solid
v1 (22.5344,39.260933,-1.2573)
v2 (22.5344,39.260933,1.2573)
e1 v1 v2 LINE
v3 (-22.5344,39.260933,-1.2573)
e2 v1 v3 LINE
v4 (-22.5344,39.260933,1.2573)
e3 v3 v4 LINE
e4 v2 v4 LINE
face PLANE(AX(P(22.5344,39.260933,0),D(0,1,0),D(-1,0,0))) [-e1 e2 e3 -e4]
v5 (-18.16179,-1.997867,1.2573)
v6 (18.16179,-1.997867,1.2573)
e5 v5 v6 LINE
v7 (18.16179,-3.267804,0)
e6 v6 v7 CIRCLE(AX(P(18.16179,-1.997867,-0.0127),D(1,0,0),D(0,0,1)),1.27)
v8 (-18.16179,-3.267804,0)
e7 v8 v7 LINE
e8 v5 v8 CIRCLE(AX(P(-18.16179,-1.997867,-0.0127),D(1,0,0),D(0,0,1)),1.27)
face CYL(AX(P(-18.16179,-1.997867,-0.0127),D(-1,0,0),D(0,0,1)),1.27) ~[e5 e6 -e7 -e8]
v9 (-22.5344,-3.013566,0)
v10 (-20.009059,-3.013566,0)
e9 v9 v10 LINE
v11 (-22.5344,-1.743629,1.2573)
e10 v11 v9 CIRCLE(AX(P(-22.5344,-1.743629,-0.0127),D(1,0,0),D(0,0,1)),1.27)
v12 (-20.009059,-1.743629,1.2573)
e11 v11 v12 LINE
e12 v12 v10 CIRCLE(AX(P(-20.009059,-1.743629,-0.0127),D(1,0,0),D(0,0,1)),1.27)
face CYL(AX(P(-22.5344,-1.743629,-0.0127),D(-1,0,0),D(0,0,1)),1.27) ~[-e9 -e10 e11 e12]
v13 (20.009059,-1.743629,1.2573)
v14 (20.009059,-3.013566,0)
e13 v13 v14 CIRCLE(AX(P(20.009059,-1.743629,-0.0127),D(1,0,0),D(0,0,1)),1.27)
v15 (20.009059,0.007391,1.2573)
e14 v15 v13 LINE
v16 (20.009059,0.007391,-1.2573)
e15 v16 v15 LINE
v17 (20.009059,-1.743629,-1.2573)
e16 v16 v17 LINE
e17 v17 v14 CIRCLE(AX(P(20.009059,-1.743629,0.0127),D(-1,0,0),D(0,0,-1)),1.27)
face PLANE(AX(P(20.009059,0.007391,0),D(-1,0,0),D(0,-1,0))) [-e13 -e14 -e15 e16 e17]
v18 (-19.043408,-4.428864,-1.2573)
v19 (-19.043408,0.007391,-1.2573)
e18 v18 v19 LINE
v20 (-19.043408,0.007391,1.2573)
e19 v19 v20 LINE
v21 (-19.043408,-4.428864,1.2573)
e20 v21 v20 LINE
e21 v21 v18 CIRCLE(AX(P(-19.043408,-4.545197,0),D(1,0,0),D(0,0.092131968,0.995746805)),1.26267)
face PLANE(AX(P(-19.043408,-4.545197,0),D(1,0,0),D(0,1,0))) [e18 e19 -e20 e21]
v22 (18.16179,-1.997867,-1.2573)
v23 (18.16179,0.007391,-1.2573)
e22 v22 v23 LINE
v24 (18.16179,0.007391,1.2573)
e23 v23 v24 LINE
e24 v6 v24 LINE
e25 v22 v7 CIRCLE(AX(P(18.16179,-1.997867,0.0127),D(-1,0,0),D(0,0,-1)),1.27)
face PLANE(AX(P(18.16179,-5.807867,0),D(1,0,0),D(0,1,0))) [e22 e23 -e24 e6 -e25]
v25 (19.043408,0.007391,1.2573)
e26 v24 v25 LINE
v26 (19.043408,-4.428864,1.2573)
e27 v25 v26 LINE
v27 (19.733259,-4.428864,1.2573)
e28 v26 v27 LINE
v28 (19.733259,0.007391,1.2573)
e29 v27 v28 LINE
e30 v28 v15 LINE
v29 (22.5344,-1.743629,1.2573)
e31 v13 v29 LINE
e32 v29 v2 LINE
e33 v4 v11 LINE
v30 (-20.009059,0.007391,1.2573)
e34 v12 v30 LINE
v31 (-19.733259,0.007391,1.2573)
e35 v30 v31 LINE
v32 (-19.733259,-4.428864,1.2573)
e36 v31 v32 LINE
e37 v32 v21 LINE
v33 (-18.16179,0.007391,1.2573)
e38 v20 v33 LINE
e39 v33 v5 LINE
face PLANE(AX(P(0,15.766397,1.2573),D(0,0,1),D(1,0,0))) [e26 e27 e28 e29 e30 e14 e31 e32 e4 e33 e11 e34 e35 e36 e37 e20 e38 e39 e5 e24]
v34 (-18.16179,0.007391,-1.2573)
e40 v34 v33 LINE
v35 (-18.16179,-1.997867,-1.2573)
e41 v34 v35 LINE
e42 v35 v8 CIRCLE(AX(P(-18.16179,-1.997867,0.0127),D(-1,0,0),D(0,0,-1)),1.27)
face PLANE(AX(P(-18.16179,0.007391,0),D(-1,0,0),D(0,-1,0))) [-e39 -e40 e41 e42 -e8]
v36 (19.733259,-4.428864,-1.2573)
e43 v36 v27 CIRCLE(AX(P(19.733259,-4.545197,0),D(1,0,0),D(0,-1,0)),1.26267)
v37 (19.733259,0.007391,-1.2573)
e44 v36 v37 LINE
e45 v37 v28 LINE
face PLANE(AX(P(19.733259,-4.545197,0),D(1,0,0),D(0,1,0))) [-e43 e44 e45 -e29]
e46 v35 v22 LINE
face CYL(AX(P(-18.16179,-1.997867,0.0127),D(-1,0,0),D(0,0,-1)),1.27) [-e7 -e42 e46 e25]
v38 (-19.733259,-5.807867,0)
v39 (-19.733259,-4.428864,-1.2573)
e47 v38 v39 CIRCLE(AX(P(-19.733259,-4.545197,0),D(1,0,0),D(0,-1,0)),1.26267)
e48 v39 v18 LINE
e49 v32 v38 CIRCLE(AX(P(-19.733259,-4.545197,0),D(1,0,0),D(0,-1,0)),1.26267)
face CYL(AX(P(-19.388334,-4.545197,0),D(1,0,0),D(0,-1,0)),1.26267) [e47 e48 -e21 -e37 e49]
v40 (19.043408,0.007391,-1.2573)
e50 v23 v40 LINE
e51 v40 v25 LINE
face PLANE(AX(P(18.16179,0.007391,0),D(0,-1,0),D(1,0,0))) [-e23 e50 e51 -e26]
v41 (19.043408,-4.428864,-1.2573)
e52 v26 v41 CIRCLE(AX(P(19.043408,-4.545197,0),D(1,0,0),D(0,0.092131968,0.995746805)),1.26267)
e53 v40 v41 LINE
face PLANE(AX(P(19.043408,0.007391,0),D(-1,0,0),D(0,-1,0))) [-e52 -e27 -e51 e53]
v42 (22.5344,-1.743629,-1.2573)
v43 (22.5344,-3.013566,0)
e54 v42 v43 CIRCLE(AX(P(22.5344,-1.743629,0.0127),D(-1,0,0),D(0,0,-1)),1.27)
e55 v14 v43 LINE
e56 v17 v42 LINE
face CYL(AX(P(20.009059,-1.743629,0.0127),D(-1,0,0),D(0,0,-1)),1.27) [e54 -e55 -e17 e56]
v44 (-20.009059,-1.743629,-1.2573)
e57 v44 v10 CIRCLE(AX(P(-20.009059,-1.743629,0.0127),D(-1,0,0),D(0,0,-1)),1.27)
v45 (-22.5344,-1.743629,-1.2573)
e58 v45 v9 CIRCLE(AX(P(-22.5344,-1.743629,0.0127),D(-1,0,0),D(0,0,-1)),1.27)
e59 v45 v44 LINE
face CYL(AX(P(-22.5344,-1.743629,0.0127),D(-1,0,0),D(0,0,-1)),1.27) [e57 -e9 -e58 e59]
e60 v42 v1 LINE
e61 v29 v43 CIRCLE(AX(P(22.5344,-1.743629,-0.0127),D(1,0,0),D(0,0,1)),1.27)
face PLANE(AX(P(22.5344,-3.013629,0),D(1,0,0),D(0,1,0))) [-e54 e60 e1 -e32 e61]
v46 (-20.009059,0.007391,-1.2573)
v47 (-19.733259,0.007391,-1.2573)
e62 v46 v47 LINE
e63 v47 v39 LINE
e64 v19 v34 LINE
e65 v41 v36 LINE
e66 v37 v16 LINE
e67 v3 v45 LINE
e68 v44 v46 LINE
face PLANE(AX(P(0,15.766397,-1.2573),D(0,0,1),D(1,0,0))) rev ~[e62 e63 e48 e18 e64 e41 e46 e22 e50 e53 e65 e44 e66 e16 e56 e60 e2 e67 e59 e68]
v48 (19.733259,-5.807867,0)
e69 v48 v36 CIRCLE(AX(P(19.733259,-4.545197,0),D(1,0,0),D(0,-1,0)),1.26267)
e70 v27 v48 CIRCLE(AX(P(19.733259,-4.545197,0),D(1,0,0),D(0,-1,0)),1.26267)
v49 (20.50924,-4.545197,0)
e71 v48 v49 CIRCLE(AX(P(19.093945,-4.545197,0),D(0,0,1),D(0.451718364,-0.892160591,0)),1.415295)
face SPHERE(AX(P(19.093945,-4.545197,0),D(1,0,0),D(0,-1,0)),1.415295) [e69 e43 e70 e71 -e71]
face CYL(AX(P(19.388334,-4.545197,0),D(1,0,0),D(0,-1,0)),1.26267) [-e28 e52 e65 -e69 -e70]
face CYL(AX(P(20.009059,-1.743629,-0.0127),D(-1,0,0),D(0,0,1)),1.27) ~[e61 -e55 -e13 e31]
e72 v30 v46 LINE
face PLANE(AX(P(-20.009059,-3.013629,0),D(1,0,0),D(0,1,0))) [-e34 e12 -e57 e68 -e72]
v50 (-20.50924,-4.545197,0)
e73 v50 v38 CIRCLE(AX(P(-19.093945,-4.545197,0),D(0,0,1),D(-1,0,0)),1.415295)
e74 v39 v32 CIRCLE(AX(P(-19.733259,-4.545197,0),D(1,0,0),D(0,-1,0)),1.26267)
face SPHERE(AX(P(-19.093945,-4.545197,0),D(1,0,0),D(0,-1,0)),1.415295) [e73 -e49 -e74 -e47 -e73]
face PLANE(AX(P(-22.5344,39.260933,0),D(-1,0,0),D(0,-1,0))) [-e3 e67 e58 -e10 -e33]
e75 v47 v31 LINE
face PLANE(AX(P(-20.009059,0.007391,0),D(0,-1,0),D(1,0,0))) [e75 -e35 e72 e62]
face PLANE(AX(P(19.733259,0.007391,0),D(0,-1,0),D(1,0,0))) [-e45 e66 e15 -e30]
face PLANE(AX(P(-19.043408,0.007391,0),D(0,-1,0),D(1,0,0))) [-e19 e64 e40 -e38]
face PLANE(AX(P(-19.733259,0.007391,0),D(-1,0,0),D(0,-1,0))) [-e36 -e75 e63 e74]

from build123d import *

# Parameters (mm, degrees)
F0_W        = 0.6898511201
F0_H        = 1.2626703829
F0_H_2      = 3.2899174839
F2_DEPTH    = 1.2573
F3_DEPTH    = 2.54
F4_T1_DEPTH = 36.3235808909
F4_T3_DEPTH = 2.5253407657
F4_T5_DEPTH = 2.5253407657


# Not quite as in the source:
# - a fillet or chamfer that OpenCascade refuses, or shapes differently, is made with other operations: its cross-section is extruded or revolved along the edge and cut away or added
# - a feature names something its author has since deleted; it is built from what else it names


with BuildPart() as f1:
    # F0 (on Top) → F1 (revolve)
    with BuildSketch(Plane.XY):
        with BuildLine():
            Line((-19.7332594544, -5.8078670874), (-19.7332594544, -4.5451967046))
            Line((-19.7332594544, -4.5451967046), (-20.5092396879, -4.5451967046))
            ThreePointArc((-20.5092396879, -4.5451967046), (-20.2997388093, -5.2862233267), (-19.7332594544, -5.8078670874))
        make_face()
        with Locations((-19.3883338943, -5.176531896)):
            Rectangle(F0_W, F0_H)
    revolve(axis=Axis((-19.3883338943, -4.5451967046, 0), (1, 0, 0)))



with BuildPart() as f1b:
    # F0 (on Top) → F1, piece 2 (revolve)
    with BuildSketch(Plane.XY):
        with BuildLine():
            Line((20.5092396879, -4.5451967046), (19.7332594544, -4.5451967046))
            Line((19.7332594544, -4.5451967046), (19.7332594544, -5.8078670874))
            ThreePointArc((19.7332594544, -5.8078670874), (20.2997388093, -5.2862233267), (20.5092396879, -4.5451967046))
        make_face()
        with Locations((19.3883338943, -5.176531896)):
            Rectangle(F0_W, F0_H)
    revolve(axis=Axis((-19.3883338943, -4.5451967046, 0), (1, 0, 0)))


with BuildPart() as f1_1:
    add(f1.part)

    add(f1b.part)  # F2 merges F1b
    # F0 (on Top) → F2 (join, symmetric)
    with BuildSketch(Plane.XY):
        Polygon((-20.009059459, 0.0073911622), (-19.7332594544, 0.0073911622), (-19.0434083343, 0.0073911622), (-18.1617904454, 0.0073911622), (-18.1617904454, -5.8078670874), (0, -5.8078670874), (18.1617904454, -5.8078670874), (18.1617904454, 0.0073911622), (19.0434083343, 0.0073911622), (19.7332594544, 0.0073911622), (20.009059459, 0.0073911622), (20.009059459, -3.01362928), (22.5344002247, -3.01362928), (22.5344002247, 39.2609333619), (0, 39.2609333619), (-22.5344002247, 39.2609333619), (-22.5344002247, -3.01362928), (-20.009059459, -3.01362928), align=None)
        with Locations((-19.3883338943, -1.6375675797)):
            Rectangle(F0_W, F0_H_2)
        with Locations((19.3883338943, -1.6375675797)):
            Rectangle(F0_W, F0_H_2)
        with Locations((-19.3883338943, -3.9138615131)):
            Rectangle(F0_W, F0_H)
        with Locations((19.3883338943, -3.9138615131)):
            Rectangle(F0_W, F0_H)
    extrude(amount=F2_DEPTH, both=True)

    # F3 (cut): a face of the model
    f3_faces = [f1_1.faces().sort_by_distance(p)[0] for p in [
        (0, -5.8078670874, 0),
    ]]
    extrude(f3_faces, amount=-F3_DEPTH, mode=Mode.SUBTRACT)

    # F4: fillet of radius 1.27 on 6 edges, made by hand

    # F4_s2 → F4_t1 (cut)
    with BuildSketch(Plane.YZ.offset(-18.1617904454)):
        with BuildLine():
            ThreePointArc((-1.9978670874, 1.2573), (-2.8958926995, 0.8853256121), (-3.2678670874, -0.0127))
            Line((-3.2678670874, -0.0127), (-3.2932670874, -0.0127))
            Line((-3.2932670874, -0.0127), (-3.2932670874, 1.2827))
            Line((-3.2932670874, 1.2827), (-1.9978670874, 1.2827))
            Line((-1.9978670874, 1.2827), (-1.9978670874, 1.2573))
        make_face()
        with BuildLine():
            ThreePointArc((-1.9978670874, -1.2573), (-2.8958926995, -0.8853256121), (-3.2678670874, 0.0127))
            Line((-3.2678670874, 0.0127), (-3.2932670874, 0.0127))
            Line((-3.2932670874, 0.0127), (-3.2932670874, -1.2827))
            Line((-3.2932670874, -1.2827), (-1.9978670874, -1.2827))
            Line((-1.9978670874, -1.2827), (-1.9978670874, -1.2573))
        make_face()
    extrude(amount=F4_T1_DEPTH, mode=Mode.SUBTRACT)

    # F4_s4 → F4_t3 (cut)
    with BuildSketch(Plane.YZ.offset(-22.5344002247)):
        with BuildLine():
            ThreePointArc((-1.74362928, 1.2573), (-2.6416548921, 0.8853256121), (-3.01362928, -0.0127))
            Line((-3.01362928, -0.0127), (-3.03902928, -0.0127))
            Line((-3.03902928, -0.0127), (-3.03902928, 1.2827))
            Line((-3.03902928, 1.2827), (-1.74362928, 1.2827))
            Line((-1.74362928, 1.2827), (-1.74362928, 1.2573))
        make_face()
        with BuildLine():
            ThreePointArc((-1.74362928, -1.2573), (-2.6416548921, -0.8853256121), (-3.01362928, 0.0127))
            Line((-3.01362928, 0.0127), (-3.03902928, 0.0127))
            Line((-3.03902928, 0.0127), (-3.03902928, -1.2827))
            Line((-3.03902928, -1.2827), (-1.74362928, -1.2827))
            Line((-1.74362928, -1.2827), (-1.74362928, -1.2573))
        make_face()
    extrude(amount=F4_T3_DEPTH, mode=Mode.SUBTRACT)

    # F4_s6 → F4_t5 (cut)
    with BuildSketch(Plane.YZ.offset(20.009059459)):
        with BuildLine():
            ThreePointArc((-1.74362928, 1.2573), (-2.6416548921, 0.8853256121), (-3.01362928, -0.0127))
            Line((-3.01362928, -0.0127), (-3.03902928, -0.0127))
            Line((-3.03902928, -0.0127), (-3.03902928, 1.2827))
            Line((-3.03902928, 1.2827), (-1.74362928, 1.2827))
            Line((-1.74362928, 1.2827), (-1.74362928, 1.2573))
        make_face()
        with BuildLine():
            ThreePointArc((-1.74362928, -1.2573), (-2.6416548921, -0.8853256121), (-3.01362928, 0.0127))
            Line((-3.01362928, 0.0127), (-3.03902928, 0.0127))
            Line((-3.03902928, 0.0127), (-3.03902928, -1.2827))
            Line((-3.03902928, -1.2827), (-1.74362928, -1.2827))
            Line((-1.74362928, -1.2827), (-1.74362928, -1.2573))
        make_face()
    extrude(amount=F4_T5_DEPTH, mode=Mode.SUBTRACT)


solid = f1_1.part
